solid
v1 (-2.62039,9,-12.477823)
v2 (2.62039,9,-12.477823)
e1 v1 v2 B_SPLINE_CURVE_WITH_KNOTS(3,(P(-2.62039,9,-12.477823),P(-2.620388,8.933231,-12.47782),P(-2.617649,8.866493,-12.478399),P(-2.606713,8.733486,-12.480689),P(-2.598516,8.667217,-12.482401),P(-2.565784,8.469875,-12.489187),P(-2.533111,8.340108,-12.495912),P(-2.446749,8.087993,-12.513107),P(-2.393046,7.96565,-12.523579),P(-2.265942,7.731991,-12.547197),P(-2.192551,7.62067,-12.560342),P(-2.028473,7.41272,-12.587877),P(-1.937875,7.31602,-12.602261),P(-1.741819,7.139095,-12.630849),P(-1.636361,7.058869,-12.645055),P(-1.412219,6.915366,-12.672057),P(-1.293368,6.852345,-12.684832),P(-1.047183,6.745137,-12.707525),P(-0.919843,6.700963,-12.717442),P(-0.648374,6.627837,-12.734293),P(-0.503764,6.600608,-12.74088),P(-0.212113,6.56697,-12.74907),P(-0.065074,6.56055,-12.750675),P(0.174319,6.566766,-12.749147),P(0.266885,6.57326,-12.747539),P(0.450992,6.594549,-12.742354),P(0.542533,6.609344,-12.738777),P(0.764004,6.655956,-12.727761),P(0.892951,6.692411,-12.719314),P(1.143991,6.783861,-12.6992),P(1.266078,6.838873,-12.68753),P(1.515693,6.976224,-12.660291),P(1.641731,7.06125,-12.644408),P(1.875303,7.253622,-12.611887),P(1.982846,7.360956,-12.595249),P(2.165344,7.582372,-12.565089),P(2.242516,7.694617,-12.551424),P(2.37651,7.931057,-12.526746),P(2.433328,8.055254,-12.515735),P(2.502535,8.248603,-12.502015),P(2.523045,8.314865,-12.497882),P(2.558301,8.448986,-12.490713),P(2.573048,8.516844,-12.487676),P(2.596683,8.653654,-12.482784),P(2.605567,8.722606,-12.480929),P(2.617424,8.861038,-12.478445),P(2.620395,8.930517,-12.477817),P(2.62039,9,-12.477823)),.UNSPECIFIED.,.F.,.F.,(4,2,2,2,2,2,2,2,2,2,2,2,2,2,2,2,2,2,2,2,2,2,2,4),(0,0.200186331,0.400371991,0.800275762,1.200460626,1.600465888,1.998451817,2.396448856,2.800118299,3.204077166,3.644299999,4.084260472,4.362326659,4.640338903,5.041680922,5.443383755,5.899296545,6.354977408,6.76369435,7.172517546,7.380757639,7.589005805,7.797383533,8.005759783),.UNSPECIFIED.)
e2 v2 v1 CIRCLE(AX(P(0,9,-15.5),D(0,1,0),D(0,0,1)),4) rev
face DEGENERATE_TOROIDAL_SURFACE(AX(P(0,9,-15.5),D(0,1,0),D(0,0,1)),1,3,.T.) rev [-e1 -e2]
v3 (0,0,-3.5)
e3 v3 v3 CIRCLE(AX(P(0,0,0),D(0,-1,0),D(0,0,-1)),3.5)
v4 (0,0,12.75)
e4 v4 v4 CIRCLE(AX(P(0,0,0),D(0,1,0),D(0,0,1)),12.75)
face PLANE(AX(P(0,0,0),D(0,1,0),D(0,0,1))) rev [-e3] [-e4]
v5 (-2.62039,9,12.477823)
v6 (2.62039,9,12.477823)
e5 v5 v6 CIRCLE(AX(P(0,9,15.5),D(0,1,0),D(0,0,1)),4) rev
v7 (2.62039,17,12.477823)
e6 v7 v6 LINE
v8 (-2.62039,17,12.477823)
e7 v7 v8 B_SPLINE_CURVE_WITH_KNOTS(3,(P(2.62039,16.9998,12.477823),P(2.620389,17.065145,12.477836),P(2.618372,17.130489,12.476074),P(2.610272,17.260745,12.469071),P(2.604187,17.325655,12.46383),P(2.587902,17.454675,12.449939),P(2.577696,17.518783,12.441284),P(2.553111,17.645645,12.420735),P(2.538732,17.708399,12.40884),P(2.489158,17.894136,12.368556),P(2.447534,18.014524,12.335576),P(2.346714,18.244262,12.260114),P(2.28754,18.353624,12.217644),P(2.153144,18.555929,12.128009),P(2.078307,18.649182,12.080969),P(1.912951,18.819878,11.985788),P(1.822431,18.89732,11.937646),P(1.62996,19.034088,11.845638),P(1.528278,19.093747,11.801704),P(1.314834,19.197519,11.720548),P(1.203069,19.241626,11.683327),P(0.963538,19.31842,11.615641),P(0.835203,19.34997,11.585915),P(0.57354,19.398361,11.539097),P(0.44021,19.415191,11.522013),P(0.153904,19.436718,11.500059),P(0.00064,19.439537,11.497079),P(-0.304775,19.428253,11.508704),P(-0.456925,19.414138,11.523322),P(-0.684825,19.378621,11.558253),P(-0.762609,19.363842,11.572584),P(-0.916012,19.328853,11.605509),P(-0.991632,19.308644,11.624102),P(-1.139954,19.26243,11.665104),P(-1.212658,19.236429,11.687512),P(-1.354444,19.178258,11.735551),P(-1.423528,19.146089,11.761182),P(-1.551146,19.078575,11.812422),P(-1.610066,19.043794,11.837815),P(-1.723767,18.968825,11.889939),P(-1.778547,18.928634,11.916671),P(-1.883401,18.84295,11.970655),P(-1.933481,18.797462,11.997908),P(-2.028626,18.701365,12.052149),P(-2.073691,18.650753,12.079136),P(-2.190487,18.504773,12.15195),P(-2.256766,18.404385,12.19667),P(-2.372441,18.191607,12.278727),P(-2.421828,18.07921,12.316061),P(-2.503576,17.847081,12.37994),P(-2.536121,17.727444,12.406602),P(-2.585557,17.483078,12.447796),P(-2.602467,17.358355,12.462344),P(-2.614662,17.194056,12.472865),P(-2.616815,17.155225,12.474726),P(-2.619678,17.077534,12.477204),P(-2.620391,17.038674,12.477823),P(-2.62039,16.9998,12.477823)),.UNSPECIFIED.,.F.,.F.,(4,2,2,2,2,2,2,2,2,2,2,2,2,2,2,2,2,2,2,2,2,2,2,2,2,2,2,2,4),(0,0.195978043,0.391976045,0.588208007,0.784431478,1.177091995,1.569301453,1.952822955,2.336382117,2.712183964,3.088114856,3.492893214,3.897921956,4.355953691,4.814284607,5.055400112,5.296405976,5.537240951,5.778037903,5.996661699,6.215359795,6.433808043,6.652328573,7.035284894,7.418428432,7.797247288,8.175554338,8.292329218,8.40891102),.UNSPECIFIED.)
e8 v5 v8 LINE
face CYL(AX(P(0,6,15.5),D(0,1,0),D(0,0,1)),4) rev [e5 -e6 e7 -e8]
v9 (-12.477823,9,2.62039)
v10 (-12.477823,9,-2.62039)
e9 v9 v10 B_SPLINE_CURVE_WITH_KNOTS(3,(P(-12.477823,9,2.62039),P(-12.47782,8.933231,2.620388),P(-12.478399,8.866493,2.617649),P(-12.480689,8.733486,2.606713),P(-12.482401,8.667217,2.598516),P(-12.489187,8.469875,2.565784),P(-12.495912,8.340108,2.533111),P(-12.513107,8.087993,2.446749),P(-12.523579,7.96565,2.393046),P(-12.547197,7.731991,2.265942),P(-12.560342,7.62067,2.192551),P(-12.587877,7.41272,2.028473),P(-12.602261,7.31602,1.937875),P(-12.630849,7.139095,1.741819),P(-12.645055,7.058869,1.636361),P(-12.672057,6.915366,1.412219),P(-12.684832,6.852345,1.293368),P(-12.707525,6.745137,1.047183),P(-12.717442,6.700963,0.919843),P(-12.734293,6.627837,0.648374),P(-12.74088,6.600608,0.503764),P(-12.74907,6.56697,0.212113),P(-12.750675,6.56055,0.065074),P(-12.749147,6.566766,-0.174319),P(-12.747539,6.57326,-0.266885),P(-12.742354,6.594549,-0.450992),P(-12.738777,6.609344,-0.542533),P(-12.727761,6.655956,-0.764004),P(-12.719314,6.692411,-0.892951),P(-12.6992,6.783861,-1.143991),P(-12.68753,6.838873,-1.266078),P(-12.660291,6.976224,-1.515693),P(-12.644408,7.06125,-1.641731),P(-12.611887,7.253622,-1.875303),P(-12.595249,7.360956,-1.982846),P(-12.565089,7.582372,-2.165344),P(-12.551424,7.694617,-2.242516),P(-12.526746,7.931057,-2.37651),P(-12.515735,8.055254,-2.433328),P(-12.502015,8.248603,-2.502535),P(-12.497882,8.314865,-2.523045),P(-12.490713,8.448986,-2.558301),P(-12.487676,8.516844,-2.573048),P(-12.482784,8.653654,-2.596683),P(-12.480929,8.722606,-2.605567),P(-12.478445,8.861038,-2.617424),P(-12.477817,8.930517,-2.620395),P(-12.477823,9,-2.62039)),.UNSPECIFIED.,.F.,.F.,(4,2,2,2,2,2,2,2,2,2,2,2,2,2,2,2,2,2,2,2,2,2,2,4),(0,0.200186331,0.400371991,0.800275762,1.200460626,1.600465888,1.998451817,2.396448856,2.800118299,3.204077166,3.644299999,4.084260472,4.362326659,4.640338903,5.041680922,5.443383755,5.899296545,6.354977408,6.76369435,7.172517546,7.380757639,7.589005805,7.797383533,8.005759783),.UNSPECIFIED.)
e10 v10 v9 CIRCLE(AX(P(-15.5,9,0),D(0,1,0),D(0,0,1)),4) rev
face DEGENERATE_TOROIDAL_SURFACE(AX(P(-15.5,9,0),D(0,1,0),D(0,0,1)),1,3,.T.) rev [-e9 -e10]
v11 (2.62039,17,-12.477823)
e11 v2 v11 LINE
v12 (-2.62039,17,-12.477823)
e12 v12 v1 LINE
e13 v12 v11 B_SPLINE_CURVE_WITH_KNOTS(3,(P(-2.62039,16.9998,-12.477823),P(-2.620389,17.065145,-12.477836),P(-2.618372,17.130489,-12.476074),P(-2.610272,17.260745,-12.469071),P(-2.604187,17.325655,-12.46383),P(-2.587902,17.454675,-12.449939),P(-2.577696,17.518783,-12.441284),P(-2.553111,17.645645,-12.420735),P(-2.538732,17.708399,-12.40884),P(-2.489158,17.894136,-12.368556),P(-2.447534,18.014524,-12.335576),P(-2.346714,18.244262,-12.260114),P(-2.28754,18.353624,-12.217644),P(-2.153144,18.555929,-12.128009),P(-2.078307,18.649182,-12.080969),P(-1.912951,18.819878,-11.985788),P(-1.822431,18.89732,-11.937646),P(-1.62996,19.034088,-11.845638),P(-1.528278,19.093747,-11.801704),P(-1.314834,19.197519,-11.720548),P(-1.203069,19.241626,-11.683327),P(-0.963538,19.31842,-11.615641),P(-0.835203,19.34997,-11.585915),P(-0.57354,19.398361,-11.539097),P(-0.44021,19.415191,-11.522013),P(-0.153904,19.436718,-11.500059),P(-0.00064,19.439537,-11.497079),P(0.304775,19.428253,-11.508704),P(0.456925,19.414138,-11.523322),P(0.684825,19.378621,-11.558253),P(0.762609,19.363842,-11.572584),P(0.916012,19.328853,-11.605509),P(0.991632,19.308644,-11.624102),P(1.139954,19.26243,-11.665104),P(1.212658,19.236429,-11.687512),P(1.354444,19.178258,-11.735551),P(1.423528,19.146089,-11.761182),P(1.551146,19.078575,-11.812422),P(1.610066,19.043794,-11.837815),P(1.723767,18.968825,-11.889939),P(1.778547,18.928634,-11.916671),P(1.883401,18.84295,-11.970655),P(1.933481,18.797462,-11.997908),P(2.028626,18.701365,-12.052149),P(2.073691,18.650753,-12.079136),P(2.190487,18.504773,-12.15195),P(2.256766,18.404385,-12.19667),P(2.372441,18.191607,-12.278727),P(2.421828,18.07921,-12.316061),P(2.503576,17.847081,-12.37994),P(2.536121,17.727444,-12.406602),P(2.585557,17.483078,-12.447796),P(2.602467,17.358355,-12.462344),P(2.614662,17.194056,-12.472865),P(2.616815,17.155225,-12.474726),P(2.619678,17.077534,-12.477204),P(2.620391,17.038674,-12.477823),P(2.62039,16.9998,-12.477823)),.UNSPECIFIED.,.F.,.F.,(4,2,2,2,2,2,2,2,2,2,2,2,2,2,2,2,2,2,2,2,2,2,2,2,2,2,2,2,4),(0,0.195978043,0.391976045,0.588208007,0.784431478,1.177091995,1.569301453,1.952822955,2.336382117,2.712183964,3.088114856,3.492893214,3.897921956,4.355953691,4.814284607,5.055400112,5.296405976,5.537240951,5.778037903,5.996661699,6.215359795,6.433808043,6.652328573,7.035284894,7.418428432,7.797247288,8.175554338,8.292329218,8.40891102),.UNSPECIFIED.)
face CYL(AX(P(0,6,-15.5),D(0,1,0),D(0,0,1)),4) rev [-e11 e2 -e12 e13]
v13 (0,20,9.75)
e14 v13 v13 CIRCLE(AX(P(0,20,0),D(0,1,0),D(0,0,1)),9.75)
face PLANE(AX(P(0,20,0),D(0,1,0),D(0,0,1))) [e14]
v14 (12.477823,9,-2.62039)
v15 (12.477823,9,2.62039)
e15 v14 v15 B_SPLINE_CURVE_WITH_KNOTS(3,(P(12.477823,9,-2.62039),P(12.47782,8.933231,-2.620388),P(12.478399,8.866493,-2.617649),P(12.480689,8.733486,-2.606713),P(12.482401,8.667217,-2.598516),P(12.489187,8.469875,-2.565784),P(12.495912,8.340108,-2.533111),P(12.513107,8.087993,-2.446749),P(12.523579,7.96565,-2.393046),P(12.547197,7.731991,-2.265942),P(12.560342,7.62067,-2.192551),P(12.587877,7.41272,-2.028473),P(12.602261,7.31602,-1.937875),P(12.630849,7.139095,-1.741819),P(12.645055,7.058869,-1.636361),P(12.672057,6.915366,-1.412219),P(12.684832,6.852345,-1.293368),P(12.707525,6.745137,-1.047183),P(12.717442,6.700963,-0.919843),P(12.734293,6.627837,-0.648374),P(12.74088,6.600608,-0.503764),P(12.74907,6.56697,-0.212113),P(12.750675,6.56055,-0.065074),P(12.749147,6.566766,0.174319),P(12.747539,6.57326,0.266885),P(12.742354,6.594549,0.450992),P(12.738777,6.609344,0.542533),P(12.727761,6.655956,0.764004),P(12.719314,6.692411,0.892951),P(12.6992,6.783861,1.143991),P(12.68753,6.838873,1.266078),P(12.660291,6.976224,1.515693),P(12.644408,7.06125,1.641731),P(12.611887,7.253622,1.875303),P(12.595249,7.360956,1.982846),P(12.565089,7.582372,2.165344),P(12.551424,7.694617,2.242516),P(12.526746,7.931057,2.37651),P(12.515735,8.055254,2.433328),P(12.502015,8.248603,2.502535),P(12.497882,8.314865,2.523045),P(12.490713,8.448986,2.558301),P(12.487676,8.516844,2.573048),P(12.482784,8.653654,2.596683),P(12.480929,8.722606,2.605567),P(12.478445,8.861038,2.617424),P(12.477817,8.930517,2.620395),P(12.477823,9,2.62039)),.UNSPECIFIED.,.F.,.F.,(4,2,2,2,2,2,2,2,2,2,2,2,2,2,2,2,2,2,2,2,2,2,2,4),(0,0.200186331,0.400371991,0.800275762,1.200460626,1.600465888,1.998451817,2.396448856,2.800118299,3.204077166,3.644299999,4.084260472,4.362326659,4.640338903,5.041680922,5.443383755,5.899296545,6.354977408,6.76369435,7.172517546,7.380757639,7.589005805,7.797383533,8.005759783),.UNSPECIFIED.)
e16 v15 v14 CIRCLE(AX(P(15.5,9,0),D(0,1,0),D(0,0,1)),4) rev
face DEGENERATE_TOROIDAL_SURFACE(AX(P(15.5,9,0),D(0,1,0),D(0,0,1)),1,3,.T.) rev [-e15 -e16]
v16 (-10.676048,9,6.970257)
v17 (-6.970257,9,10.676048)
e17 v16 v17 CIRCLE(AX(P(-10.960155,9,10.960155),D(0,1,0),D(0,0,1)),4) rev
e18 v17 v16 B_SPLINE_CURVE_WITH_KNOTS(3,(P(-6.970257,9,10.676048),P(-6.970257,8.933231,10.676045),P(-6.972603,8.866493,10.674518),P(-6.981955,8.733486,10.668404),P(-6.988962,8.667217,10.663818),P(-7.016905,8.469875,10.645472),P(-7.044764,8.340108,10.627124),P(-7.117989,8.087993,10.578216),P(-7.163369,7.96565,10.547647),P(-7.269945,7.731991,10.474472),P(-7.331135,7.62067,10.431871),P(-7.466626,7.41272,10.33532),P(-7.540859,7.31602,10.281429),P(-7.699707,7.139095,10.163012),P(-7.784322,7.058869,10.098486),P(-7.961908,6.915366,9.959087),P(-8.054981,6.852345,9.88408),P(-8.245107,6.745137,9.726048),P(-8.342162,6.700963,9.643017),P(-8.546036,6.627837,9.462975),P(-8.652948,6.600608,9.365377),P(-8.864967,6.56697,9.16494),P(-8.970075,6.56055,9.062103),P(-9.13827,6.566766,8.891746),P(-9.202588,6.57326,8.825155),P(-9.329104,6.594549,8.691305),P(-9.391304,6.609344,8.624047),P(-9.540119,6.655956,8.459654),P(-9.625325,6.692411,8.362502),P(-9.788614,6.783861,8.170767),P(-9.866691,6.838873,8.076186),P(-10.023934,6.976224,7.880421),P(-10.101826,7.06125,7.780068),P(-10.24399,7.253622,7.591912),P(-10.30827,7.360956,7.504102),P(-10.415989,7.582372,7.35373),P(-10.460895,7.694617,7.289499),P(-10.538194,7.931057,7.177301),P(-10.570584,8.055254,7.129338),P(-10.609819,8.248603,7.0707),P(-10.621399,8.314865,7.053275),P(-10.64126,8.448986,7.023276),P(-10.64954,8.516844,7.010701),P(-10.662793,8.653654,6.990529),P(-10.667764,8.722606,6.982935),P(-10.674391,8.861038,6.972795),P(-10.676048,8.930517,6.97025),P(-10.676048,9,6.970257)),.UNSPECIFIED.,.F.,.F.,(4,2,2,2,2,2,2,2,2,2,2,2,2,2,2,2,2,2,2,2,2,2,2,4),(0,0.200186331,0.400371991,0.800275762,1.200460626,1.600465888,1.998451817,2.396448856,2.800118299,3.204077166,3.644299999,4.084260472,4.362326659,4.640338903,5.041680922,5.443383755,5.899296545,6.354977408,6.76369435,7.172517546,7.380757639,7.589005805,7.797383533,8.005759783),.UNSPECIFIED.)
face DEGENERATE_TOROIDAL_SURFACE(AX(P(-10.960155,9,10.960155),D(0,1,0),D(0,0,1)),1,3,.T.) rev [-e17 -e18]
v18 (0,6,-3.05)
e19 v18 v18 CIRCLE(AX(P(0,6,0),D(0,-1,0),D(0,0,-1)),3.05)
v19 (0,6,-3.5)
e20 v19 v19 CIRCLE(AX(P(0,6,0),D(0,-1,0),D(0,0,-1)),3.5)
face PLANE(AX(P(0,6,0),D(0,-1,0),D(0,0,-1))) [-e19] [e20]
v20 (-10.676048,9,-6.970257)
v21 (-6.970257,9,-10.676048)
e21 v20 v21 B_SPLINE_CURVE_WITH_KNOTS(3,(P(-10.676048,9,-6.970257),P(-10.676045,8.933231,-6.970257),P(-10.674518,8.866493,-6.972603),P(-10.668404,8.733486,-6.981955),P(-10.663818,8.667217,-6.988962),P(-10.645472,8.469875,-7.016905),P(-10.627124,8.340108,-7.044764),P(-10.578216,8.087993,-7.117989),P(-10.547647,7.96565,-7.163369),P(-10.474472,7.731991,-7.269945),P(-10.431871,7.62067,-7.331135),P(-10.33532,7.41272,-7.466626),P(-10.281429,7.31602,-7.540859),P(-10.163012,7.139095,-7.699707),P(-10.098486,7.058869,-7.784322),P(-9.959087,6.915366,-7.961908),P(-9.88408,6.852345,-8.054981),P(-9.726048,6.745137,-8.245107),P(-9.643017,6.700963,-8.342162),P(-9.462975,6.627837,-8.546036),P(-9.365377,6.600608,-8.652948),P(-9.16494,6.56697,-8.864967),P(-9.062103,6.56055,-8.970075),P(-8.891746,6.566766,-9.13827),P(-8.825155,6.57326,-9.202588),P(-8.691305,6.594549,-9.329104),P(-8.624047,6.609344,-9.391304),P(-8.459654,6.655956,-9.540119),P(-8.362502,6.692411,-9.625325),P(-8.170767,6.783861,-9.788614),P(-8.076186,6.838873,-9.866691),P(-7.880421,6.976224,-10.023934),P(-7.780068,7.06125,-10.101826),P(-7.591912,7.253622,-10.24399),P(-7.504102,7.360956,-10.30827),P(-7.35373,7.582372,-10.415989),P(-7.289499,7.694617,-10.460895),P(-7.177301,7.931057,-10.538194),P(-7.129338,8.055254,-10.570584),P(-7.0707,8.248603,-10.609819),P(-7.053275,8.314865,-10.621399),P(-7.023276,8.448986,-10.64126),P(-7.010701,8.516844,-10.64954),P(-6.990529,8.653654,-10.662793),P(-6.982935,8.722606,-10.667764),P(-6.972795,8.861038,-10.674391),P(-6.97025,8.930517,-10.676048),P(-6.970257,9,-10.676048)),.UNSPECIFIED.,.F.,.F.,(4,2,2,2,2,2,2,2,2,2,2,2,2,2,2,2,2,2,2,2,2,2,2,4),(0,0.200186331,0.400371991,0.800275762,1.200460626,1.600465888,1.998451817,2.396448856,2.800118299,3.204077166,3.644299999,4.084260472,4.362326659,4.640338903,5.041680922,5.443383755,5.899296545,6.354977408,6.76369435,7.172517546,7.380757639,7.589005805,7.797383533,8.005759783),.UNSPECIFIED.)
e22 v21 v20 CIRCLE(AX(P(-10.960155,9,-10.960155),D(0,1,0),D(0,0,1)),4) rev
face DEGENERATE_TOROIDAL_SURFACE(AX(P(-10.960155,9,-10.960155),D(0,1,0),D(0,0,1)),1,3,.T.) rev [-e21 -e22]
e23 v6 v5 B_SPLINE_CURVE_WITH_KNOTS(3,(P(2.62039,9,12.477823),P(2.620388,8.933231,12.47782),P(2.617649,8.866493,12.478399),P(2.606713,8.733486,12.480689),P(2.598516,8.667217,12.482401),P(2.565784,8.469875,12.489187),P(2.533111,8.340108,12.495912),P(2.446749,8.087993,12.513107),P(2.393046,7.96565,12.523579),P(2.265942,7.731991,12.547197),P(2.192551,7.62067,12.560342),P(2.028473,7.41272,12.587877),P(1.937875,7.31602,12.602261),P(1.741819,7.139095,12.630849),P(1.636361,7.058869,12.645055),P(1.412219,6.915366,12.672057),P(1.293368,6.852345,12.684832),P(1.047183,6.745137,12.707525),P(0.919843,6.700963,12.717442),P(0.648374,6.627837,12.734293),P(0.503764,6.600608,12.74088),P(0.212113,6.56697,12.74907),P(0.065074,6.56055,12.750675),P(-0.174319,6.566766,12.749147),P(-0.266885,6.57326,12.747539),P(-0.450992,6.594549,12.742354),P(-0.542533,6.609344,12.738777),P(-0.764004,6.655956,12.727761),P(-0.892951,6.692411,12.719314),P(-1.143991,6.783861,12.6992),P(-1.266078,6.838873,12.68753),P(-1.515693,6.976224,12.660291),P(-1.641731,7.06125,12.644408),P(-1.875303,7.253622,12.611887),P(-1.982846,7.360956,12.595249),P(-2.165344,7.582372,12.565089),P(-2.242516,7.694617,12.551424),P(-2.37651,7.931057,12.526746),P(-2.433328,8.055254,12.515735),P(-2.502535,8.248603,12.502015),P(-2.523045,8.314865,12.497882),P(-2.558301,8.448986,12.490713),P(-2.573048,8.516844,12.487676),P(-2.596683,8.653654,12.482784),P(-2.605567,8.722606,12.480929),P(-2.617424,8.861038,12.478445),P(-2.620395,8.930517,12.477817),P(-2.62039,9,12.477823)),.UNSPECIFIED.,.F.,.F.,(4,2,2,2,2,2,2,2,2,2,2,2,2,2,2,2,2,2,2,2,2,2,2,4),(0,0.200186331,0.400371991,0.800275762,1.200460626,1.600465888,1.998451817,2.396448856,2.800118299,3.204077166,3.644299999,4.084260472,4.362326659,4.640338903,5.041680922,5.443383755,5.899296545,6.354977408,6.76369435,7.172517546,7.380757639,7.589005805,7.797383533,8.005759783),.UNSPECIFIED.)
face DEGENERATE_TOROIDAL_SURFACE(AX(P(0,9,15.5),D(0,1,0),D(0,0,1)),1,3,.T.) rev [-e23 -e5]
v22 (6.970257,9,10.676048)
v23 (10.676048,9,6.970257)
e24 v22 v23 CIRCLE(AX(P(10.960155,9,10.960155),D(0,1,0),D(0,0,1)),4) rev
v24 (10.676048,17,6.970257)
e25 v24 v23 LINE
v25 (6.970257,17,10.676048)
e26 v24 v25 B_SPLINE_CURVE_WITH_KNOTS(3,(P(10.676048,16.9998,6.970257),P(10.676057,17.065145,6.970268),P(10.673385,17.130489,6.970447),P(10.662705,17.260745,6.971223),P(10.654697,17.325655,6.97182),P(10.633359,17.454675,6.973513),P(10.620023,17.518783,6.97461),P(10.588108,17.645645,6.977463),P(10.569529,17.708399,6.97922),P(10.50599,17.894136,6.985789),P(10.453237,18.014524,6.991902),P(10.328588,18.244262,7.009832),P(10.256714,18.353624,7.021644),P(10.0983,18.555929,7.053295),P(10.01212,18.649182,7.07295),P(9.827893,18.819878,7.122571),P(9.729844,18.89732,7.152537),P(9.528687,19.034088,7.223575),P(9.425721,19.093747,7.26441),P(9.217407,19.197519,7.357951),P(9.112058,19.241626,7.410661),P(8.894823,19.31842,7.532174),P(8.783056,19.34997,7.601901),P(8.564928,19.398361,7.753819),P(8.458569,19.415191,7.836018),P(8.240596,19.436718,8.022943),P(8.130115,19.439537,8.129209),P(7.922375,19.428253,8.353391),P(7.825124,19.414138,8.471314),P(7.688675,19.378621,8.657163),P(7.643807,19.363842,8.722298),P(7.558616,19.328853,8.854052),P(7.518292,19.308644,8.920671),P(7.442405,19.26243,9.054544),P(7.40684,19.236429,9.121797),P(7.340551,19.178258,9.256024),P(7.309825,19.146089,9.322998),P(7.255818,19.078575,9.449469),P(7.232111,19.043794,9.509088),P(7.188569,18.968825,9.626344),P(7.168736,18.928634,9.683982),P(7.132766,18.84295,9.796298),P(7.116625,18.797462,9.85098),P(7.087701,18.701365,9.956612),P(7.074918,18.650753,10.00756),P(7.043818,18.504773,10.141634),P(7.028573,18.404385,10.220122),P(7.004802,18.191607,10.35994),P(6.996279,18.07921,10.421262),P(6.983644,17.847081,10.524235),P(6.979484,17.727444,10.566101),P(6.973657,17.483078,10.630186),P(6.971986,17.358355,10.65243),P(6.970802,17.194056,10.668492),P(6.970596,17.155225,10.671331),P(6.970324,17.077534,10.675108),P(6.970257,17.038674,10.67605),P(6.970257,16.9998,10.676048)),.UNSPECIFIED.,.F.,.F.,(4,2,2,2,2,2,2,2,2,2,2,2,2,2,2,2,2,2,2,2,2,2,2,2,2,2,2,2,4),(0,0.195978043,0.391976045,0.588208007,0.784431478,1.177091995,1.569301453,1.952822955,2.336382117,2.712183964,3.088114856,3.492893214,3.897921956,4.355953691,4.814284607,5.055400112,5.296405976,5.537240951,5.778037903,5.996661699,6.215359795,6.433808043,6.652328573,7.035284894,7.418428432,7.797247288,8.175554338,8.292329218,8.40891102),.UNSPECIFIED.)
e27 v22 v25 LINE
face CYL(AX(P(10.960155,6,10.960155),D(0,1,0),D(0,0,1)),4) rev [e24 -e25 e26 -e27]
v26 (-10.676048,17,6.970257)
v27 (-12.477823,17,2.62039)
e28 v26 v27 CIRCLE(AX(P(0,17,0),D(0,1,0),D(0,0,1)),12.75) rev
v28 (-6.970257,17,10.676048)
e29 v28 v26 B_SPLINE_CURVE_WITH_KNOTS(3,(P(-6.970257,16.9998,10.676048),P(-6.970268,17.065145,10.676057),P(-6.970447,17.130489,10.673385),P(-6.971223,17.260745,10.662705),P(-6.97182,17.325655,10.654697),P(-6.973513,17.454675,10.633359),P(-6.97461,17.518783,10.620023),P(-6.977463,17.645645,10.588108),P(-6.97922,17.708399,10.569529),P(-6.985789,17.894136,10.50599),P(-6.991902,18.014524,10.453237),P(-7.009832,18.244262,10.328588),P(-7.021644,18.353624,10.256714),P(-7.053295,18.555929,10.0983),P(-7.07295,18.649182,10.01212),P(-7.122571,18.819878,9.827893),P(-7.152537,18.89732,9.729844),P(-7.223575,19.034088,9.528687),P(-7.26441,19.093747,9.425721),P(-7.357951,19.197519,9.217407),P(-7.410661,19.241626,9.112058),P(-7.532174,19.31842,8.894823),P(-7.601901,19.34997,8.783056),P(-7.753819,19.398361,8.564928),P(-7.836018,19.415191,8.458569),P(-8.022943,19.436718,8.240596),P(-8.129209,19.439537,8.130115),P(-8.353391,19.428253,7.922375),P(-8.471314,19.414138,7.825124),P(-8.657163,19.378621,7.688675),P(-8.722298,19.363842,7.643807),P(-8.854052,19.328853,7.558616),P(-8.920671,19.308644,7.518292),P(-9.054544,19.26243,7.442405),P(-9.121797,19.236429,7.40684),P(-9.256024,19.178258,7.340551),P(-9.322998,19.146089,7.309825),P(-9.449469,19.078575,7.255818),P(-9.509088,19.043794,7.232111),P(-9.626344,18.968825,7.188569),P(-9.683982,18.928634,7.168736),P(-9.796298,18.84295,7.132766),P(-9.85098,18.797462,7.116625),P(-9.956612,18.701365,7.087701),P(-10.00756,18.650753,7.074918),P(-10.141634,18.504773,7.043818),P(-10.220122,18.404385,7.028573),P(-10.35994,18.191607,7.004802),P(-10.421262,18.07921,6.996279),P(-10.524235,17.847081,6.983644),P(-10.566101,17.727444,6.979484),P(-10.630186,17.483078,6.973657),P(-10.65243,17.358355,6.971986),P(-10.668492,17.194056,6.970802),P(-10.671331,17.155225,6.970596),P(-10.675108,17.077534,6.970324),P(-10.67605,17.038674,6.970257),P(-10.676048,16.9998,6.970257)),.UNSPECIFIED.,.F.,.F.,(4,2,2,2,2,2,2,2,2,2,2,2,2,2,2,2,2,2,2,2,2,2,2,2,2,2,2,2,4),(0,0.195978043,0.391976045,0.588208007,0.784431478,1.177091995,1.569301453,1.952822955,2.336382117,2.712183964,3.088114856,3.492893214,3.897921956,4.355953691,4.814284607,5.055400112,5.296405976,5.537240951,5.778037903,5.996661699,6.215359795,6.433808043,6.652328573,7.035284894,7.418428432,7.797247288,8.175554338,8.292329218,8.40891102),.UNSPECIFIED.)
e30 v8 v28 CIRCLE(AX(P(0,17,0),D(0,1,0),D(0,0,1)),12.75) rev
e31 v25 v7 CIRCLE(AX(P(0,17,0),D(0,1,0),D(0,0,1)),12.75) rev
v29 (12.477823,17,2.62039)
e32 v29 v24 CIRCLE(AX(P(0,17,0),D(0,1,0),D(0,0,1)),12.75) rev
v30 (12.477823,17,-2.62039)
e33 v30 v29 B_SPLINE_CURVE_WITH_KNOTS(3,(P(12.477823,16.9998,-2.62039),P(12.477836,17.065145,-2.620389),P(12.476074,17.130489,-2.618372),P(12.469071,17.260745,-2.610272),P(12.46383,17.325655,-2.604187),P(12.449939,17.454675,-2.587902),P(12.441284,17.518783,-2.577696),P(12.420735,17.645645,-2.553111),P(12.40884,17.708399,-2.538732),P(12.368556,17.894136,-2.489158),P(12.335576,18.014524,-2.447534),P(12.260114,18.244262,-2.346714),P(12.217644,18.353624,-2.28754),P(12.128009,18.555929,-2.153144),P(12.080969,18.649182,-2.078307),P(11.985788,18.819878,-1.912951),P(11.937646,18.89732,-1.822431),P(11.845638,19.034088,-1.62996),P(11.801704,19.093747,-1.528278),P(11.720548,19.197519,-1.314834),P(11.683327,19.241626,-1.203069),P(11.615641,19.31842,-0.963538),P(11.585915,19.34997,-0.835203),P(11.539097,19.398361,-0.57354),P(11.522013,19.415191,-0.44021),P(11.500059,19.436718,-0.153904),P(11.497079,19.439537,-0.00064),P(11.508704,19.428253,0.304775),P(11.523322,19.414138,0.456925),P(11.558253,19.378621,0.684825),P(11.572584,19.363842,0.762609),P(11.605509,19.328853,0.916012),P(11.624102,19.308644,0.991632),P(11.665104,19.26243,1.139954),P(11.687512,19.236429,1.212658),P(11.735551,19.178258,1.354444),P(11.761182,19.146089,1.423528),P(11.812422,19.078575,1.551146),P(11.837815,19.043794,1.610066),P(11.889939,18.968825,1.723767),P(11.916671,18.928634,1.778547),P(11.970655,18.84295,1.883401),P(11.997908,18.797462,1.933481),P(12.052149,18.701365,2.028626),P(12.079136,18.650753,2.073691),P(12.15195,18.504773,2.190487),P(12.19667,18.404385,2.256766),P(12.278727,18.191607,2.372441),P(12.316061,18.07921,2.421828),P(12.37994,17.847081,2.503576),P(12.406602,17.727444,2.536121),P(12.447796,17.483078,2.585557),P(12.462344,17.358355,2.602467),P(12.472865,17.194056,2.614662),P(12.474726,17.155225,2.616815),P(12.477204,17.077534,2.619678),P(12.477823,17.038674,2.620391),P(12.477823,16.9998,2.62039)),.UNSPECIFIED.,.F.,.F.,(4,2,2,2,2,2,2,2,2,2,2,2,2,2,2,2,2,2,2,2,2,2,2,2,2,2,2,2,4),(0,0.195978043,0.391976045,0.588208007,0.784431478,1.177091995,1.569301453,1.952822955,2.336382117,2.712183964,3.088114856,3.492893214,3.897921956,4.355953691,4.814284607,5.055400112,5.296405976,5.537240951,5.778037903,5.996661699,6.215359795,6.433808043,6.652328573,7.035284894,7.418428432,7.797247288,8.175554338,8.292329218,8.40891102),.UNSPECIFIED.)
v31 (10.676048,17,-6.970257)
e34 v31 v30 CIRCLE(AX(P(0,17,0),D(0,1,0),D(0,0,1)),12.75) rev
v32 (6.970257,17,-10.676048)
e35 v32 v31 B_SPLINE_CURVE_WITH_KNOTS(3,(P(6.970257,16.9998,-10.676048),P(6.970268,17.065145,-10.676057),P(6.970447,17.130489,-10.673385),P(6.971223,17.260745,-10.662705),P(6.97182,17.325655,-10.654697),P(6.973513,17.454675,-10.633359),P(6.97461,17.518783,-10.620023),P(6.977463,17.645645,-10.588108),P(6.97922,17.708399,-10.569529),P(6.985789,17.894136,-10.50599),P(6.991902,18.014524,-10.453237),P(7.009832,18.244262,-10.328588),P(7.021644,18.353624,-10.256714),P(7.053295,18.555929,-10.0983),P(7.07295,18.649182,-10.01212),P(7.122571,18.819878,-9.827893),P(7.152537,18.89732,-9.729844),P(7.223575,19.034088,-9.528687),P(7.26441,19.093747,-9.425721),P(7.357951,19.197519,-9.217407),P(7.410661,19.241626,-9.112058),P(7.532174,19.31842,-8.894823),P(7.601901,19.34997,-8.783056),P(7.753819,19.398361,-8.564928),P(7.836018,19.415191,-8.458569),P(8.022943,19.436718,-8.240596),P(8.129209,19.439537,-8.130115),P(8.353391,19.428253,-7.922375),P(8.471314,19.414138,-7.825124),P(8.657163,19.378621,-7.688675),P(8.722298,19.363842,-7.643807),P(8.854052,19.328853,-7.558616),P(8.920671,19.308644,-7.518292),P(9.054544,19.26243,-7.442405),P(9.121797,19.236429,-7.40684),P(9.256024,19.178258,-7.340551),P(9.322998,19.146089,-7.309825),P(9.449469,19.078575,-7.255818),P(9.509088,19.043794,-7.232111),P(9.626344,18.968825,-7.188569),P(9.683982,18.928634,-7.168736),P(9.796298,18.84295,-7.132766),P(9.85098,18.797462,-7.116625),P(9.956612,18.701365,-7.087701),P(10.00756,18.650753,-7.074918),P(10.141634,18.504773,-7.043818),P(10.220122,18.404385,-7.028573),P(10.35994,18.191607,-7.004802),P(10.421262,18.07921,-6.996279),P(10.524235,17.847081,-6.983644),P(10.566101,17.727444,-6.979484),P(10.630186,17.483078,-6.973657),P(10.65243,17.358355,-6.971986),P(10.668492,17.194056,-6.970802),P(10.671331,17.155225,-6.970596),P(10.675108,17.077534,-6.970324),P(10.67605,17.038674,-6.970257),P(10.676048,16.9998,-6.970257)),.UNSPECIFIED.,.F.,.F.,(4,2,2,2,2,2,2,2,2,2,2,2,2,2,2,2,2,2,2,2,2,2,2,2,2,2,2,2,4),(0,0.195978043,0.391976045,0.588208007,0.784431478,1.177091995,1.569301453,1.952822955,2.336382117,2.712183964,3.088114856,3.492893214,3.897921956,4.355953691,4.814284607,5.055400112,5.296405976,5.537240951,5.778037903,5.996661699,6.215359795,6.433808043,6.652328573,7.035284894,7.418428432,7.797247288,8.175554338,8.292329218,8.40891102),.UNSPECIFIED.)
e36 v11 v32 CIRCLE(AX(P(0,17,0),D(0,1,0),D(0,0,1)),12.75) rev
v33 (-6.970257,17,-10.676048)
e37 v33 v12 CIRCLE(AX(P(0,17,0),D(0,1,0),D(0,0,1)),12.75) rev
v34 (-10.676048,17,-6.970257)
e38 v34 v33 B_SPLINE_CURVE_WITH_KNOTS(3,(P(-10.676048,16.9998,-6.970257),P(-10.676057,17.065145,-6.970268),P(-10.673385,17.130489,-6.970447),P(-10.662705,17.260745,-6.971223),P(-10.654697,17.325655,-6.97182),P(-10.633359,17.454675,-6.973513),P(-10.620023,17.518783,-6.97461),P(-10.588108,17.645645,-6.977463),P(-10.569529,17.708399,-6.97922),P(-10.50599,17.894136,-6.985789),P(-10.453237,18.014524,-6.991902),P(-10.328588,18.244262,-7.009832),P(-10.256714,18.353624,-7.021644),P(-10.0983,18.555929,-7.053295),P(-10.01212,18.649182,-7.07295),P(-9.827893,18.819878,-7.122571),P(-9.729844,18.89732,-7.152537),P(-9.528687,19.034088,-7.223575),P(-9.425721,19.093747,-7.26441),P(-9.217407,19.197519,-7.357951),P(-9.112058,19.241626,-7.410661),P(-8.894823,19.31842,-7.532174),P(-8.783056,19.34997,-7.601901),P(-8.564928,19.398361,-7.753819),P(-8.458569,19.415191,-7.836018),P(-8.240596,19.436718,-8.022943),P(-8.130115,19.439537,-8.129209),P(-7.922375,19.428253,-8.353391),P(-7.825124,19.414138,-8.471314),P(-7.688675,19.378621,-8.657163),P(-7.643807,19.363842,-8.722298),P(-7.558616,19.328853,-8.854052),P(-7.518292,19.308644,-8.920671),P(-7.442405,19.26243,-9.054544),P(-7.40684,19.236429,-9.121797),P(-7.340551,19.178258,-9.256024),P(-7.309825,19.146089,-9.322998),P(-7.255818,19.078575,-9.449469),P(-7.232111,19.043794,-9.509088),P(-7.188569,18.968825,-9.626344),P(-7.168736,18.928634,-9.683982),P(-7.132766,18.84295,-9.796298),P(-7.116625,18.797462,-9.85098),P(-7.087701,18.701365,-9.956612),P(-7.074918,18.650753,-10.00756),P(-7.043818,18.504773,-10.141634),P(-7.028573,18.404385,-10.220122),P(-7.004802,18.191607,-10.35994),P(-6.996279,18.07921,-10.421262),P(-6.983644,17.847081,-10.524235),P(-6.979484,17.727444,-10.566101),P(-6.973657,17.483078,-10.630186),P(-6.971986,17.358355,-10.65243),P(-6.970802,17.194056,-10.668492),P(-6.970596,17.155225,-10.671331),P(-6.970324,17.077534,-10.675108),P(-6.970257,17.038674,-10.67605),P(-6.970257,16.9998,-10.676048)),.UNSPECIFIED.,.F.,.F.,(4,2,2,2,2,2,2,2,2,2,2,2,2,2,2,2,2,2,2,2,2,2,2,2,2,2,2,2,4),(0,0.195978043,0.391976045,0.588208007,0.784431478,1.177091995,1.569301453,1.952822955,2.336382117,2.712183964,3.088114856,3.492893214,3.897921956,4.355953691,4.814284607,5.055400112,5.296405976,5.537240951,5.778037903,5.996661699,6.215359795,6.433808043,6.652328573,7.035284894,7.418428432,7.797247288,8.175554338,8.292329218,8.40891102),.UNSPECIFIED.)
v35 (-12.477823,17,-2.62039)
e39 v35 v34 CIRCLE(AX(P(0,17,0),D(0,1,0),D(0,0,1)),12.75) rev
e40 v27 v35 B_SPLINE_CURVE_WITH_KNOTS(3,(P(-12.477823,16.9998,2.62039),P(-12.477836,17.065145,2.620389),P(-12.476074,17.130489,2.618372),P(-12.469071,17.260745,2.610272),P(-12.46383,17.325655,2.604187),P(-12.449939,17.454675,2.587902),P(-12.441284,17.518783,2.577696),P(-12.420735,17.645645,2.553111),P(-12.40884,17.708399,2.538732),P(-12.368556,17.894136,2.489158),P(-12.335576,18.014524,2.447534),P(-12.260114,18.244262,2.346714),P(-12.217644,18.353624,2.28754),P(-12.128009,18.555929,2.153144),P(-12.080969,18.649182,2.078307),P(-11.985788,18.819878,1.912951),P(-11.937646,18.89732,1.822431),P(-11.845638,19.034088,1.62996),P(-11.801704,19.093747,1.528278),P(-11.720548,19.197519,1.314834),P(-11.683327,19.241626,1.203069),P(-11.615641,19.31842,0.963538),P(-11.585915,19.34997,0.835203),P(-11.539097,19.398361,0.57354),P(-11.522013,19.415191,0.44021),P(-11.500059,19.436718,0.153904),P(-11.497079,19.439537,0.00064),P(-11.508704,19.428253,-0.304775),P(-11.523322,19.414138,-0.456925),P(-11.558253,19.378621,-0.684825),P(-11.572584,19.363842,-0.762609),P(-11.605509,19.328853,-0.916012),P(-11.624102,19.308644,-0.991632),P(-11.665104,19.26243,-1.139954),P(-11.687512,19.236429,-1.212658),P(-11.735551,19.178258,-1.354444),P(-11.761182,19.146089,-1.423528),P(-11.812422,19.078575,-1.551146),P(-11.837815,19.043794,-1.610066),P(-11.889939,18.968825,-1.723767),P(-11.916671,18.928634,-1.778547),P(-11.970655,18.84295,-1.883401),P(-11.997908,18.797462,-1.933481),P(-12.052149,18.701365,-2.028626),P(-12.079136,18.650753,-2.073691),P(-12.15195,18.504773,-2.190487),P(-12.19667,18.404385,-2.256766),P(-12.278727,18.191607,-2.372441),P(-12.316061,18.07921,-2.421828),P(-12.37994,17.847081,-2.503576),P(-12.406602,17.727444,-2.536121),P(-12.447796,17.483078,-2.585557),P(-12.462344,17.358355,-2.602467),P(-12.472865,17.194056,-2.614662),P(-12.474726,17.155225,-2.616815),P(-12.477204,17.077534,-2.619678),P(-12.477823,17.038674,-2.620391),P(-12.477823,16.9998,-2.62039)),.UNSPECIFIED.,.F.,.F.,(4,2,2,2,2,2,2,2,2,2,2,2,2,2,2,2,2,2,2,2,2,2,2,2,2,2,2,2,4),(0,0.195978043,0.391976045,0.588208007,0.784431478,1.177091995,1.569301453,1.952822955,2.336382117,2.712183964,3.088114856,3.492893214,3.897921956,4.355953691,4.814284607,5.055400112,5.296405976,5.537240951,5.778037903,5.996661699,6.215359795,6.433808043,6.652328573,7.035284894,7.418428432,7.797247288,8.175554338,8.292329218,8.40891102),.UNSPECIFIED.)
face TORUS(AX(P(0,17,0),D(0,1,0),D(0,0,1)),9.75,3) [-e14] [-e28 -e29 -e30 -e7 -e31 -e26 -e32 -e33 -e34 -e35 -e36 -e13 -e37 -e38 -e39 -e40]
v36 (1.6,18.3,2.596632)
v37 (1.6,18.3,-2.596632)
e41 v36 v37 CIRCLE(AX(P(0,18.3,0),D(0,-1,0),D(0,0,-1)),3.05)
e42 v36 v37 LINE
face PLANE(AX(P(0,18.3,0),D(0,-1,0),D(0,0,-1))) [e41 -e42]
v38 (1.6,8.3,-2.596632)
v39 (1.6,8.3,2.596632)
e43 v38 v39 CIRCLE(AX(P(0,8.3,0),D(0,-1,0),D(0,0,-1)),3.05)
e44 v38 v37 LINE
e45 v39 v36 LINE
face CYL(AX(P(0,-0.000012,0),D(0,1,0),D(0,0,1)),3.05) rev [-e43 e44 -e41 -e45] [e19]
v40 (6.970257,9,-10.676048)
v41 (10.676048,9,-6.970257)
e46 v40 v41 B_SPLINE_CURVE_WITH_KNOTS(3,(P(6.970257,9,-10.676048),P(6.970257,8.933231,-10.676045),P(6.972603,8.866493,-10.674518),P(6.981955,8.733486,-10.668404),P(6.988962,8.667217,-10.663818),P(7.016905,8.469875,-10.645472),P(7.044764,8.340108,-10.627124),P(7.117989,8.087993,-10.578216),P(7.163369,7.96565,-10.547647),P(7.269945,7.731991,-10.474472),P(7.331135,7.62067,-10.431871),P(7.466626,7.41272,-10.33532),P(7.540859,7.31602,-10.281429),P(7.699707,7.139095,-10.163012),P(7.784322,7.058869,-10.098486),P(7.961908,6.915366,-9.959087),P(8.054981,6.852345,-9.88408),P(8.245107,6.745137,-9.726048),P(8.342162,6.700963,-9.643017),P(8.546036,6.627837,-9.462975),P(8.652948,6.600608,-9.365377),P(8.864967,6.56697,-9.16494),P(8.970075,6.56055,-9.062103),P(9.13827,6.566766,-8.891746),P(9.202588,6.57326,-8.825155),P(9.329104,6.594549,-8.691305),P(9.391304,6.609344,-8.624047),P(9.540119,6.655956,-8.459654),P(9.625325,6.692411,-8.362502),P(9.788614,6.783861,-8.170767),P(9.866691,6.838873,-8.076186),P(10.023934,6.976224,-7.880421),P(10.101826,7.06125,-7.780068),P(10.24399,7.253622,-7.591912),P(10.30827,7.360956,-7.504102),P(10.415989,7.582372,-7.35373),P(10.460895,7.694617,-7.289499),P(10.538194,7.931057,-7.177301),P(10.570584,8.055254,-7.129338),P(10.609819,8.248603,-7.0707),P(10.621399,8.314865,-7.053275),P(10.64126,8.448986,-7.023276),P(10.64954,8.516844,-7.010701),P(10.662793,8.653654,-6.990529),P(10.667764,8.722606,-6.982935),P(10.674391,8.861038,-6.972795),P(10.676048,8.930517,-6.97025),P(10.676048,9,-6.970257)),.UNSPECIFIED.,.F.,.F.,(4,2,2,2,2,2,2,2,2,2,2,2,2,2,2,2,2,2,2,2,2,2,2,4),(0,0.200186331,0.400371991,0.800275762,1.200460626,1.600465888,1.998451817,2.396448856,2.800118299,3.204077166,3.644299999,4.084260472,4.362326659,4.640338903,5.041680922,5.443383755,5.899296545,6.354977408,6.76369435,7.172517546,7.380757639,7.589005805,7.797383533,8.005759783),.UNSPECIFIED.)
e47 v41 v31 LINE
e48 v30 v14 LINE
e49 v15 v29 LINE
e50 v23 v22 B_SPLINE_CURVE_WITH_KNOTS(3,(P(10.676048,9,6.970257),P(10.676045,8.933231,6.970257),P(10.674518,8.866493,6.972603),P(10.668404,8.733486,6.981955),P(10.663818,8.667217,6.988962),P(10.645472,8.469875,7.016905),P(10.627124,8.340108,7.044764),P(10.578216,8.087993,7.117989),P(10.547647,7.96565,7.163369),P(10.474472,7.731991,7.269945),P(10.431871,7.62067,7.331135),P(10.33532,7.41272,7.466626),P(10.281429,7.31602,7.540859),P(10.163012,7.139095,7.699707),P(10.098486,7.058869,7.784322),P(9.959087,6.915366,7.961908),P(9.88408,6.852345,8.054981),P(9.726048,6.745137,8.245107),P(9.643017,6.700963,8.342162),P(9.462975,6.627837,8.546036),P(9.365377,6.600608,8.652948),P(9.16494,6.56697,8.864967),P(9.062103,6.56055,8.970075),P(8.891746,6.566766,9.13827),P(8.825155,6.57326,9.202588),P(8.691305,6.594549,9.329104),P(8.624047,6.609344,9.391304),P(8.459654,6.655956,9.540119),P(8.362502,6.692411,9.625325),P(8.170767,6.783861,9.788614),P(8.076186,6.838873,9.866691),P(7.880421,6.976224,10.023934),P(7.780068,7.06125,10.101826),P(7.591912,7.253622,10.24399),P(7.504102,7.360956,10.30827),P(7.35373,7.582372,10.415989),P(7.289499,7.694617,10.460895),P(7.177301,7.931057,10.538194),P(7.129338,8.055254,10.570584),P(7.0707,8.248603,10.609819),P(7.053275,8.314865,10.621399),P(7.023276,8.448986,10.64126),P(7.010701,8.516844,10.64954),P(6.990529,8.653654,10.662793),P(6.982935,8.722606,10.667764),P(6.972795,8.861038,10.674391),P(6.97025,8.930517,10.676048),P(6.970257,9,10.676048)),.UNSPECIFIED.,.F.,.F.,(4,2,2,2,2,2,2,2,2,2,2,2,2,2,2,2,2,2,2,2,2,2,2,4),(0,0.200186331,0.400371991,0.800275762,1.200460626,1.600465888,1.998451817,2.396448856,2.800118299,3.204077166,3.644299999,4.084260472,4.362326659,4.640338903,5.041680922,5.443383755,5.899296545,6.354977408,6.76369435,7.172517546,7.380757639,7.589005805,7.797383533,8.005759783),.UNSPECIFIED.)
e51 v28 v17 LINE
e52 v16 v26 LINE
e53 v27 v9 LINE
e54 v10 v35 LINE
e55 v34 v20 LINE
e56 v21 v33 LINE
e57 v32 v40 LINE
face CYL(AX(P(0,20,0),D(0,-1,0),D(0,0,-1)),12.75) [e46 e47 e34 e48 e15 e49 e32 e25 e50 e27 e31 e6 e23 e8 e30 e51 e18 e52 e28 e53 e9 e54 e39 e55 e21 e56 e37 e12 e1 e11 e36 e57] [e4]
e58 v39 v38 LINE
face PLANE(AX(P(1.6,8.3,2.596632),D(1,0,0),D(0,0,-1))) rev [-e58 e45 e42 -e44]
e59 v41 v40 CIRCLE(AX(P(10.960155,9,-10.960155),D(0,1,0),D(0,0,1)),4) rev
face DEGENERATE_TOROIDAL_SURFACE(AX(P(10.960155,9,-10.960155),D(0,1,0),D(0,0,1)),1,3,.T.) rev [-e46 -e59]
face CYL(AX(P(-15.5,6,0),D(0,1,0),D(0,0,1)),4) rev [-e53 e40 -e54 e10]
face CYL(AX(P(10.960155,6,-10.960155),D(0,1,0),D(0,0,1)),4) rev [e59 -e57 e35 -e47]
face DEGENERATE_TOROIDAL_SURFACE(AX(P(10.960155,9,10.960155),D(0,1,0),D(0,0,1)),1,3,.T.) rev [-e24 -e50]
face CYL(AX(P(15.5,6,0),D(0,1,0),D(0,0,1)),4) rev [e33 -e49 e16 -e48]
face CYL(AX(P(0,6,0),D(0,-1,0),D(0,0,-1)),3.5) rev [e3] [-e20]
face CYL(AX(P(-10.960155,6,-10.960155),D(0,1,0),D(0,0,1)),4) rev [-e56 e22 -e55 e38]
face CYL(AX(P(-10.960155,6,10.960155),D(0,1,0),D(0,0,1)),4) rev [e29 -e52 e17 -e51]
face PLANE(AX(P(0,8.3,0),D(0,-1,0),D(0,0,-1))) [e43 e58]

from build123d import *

# Parameters (mm, degrees)
SKETCH1_R               = 12.75
BOSS_EXTRUDE1_DEPTH     = 20
CUT_EXTRUDE1_DEPTH      = 27.928145127
CUT_EXTRUDE1_DEPTH_BACK = 18.3
SKETCH2_R               = 3.05
SKETCH3_R               = 3.5
CUT_EXTRUDE2_DEPTH      = 6
FILLET1_R               = 3
SKETCH5_R               = 4
CUT_EXTRUDE3_DEPTH      = 14
FILLET3_R               = 3
BOSS_EXTRUDE2_START     = 10
BOSS_EXTRUDE2_DEPTH     = 10


with BuildPart() as part:
    # Sketch1 → Boss-Extrude1 (new body)
    with BuildSketch(Plane(origin=(0, 0, 0), x_dir=(1, 0, 0), z_dir=(0, 1, 0))):
        with Locations(Location((0, 0, 0), (0, 0, 270))):
            Circle(SKETCH1_R)
    extrude(amount=BOSS_EXTRUDE1_DEPTH)

    # Sketch2 → Cut-Extrude1 (cut, two sides: drawn at the far end of the back side and taken through both)
    with BuildSketch(Plane.XZ.offset(-CUT_EXTRUDE1_DEPTH_BACK)):
        with Locations(Location((0, 0, 0), (0, 0, 90))):
            Circle(SKETCH2_R)
    extrude(amount=CUT_EXTRUDE1_DEPTH + CUT_EXTRUDE1_DEPTH_BACK, mode=Mode.SUBTRACT)

    # Sketch3 → Cut-Extrude2 (cut)
    with BuildSketch(Plane.XZ):
        with Locations(Location((0, 0, 0), (0, 0, 270))):
            Circle(SKETCH3_R)
    extrude(amount=-CUT_EXTRUDE2_DEPTH, mode=Mode.SUBTRACT)

    # Fillet1
    fillet1_edges = [part.edges().sort_by_distance(p)[0] for p in [
        (0, 20, -12.75),
    ]]
    fillet(fillet1_edges, radius=FILLET1_R)

    # Sketch5 → Cut-Extrude3 (cut)
    with BuildSketch(Plane(origin=(0, 20, 0), x_dir=(1, 0, 0), z_dir=(0, 1, 0))):
        with Locations((0, 15.5)):
            Circle(SKETCH5_R)
        with Locations((10.960155108, 10.960155108)):
            Circle(SKETCH5_R)
        with Locations((15.5, 0)):
            Circle(SKETCH5_R)
        with Locations((10.960155108, -10.960155108)):
            Circle(SKETCH5_R)
        with Locations((0, -15.5)):
            Circle(SKETCH5_R)
        with Locations((-10.960155108, -10.960155108)):
            Circle(SKETCH5_R)
        with Locations((-15.5, 0)):
            Circle(SKETCH5_R)
        with Locations((-10.960155108, 10.960155108)):
            Circle(SKETCH5_R)
    extrude(amount=-CUT_EXTRUDE3_DEPTH, mode=Mode.SUBTRACT)

    # Fillet3
    # the kernel refuses this fillet: 3 mm, written as the material it adds along each edge
    with BuildSketch(Plane(origin=(0, 6, 15.5), x_dir=(0.5240999982324142, 0, 0.8516567335803691), z_dir=(-0.8516567335803691, 0, 0.5240999982324142))) as fillet3_piece_1_section:
        with BuildLine():
            CenterArc((4 - FILLET3_R, FILLET3_R), FILLET3_R, 270, 90)
            Line((4 - FILLET3_R, 0), (4, 0))
            Line((4, 0), (4, FILLET3_R))
        make_face()
    fillet3_piece_1 = revolve(axis=Axis((0, 6, 15.5), (0, 1, 0)), revolution_arc=296.784649365, mode=Mode.PRIVATE)
    fillet3_piece_1 = fillet3_piece_1 & Plane(origin=(0, 6.906503108, 0), x_dir=(0, 0, 1), z_dir=(0, -1, 0)) * Cylinder(12.75, 17, mode=Mode.PRIVATE)
    add(fillet3_piece_1)
    with BuildSketch(Plane(origin=(-10.960155108, 6, 10.960155108), x_dir=(-0.2316175887878651, 0, 0.9728069143278617), z_dir=(-0.9728069143278617, 0, -0.2316175887878651))) as fillet3_piece_2_section:
        with BuildLine():
            CenterArc((4 - FILLET3_R, FILLET3_R), FILLET3_R, 270, 90)
            Line((4, FILLET3_R), (4, 0))
            Line((4, 0), (4 - FILLET3_R, 0))
        make_face()
    fillet3_piece_2 = revolve(axis=Axis((-10.960155108, 6, 10.960155108), (0, 1, 0)), revolution_arc=296.784649365, mode=Mode.PRIVATE)
    fillet3_piece_2 = fillet3_piece_2 & Plane(origin=(0, 6.906501973, 0), x_dir=(0, 0, 1), z_dir=(0, -1, 0)) * Cylinder(12.75, 16, mode=Mode.PRIVATE)
    add(fillet3_piece_2)
    with BuildSketch(Plane(origin=(-15.5, 6, 0), x_dir=(-0.8516567335803689, 0, -0.524099998232414), z_dir=(-0.524099998232414, 0, 0.8516567335803689))) as fillet3_piece_3_section:
        with BuildLine():
            CenterArc((4 - FILLET3_R, -FILLET3_R), FILLET3_R, 0, 90)
            Line((4, -FILLET3_R), (4, 0))
            Line((4, 0), (4 - FILLET3_R, 0))
        make_face()
    fillet3_piece_3 = revolve(axis=Axis((-15.5, 6, 0), (0, -1, 0)), revolution_arc=296.784649365, mode=Mode.PRIVATE)
    fillet3_piece_3 = fillet3_piece_3 & Plane(origin=(0, 6.90650195, 0), x_dir=(0, 0, 1), z_dir=(0, -1, 0)) * Cylinder(12.75, 16, mode=Mode.PRIVATE)
    add(fillet3_piece_3)
    with BuildSketch(Plane(origin=(-10.960155108, 6, -10.960155108), x_dir=(-0.9728069143278615, 0, -0.23161758878786548), z_dir=(0.23161758878786548, 0, -0.9728069143278615))) as fillet3_piece_4_section:
        with BuildLine():
            CenterArc((4 - FILLET3_R, FILLET3_R), FILLET3_R, 270, 90)
            Line((4, FILLET3_R), (4, 0))
            Line((4, 0), (4 - FILLET3_R, 0))
        make_face()
    fillet3_piece_4 = revolve(axis=Axis((-10.960155108, 6, -10.960155108), (0, 1, 0)), revolution_arc=296.784649365, mode=Mode.PRIVATE)
    fillet3_piece_4 = fillet3_piece_4 & Plane(origin=(0, 6.906501973, 0), x_dir=(0, 0, 1), z_dir=(0, -1, 0)) * Cylinder(12.75, 17, mode=Mode.PRIVATE)
    add(fillet3_piece_4)
    with BuildSketch(Plane(origin=(0, 6, -15.5), x_dir=(-0.5240999982324135, 0, -0.8516567335803694), z_dir=(0.8516567335803694, 0, -0.5240999982324135))) as fillet3_piece_5_section:
        with BuildLine():
            CenterArc((4 - FILLET3_R, FILLET3_R), FILLET3_R, 270, 90)
            Line((4, FILLET3_R), (4, 0))
            Line((4, 0), (4 - FILLET3_R, 0))
        make_face()
    fillet3_piece_5 = revolve(axis=Axis((0, 6, -15.5), (0, 1, 0)), revolution_arc=296.784649365, mode=Mode.PRIVATE)
    fillet3_piece_5 = fillet3_piece_5 & Plane(origin=(0, 6.906501973, 0), x_dir=(0, 0, 1), z_dir=(0, -1, 0)) * Cylinder(12.75, 16, mode=Mode.PRIVATE)
    add(fillet3_piece_5)
    with BuildSketch(Plane(origin=(10.960155108, 6, -10.960155108), x_dir=(0.2316175887878651, 0, -0.9728069143278617), z_dir=(0.9728069143278617, 0, 0.2316175887878651))) as fillet3_piece_6_section:
        with BuildLine():
            CenterArc((4 - FILLET3_R, FILLET3_R), FILLET3_R, 270, 90)
            Line((4, FILLET3_R), (4, 0))
            Line((4, 0), (4 - FILLET3_R, 0))
        make_face()
    fillet3_piece_6 = revolve(axis=Axis((10.960155108, 6, -10.960155108), (0, 1, 0)), revolution_arc=296.784649365, mode=Mode.PRIVATE)
    fillet3_piece_6 = fillet3_piece_6 & Plane(origin=(0, 6.906501973, 0), x_dir=(0, 0, 1), z_dir=(0, -1, 0)) * Cylinder(12.75, 16, mode=Mode.PRIVATE)
    add(fillet3_piece_6)
    with BuildSketch(Plane(origin=(15.5, 6, 0), x_dir=(0.8516567335803694, 0, -0.5240999982324135), z_dir=(0.5240999982324135, 0, 0.8516567335803694))) as fillet3_piece_7_section:
        with BuildLine():
            CenterArc((4 - FILLET3_R, FILLET3_R), FILLET3_R, 270, 90)
            Line((4, FILLET3_R), (4, 0))
            Line((4, 0), (4 - FILLET3_R, 0))
        make_face()
    fillet3_piece_7 = revolve(axis=Axis((15.5, 6, 0), (0, 1, 0)), revolution_arc=296.784649365, mode=Mode.PRIVATE)
    fillet3_piece_7 = fillet3_piece_7 & Plane(origin=(0, 6.906501973, 0), x_dir=(0, 0, 1), z_dir=(0, -1, 0)) * Cylinder(12.75, 17, mode=Mode.PRIVATE)
    add(fillet3_piece_7)
    with BuildSketch(Plane(origin=(10.960155108, 6, 10.960155108), x_dir=(0.9728069143278617, 0, 0.2316175887878651), z_dir=(-0.2316175887878651, 0, 0.9728069143278617))) as fillet3_piece_8_section:
        with BuildLine():
            CenterArc((4 - FILLET3_R, FILLET3_R), FILLET3_R, 270, 90)
            Line((4, FILLET3_R), (4, 0))
            Line((4, 0), (4 - FILLET3_R, 0))
        make_face()
    fillet3_piece_8 = revolve(axis=Axis((10.960155108, 6, 10.960155108), (0, 1, 0)), revolution_arc=296.784649365, mode=Mode.PRIVATE)
    fillet3_piece_8 = fillet3_piece_8 & Plane(origin=(0, 6.906501973, 0), x_dir=(0, 0, 1), z_dir=(0, -1, 0)) * Cylinder(12.75, 16, mode=Mode.PRIVATE)
    add(fillet3_piece_8)

    # Sketch6 → Boss-Extrude2 (add)
    with BuildSketch(Plane.XZ.offset(-18.3).offset(BOSS_EXTRUDE2_START)):
        with BuildLine():
            Line((1.6, 2.596632435), (1.6, -2.596632435))
            ThreePointArc((1.6, -2.596632435), (3.05, 0), (1.6, 2.596632435))
        make_face()
    extrude(amount=-BOSS_EXTRUDE2_DEPTH)


solid = part.part
